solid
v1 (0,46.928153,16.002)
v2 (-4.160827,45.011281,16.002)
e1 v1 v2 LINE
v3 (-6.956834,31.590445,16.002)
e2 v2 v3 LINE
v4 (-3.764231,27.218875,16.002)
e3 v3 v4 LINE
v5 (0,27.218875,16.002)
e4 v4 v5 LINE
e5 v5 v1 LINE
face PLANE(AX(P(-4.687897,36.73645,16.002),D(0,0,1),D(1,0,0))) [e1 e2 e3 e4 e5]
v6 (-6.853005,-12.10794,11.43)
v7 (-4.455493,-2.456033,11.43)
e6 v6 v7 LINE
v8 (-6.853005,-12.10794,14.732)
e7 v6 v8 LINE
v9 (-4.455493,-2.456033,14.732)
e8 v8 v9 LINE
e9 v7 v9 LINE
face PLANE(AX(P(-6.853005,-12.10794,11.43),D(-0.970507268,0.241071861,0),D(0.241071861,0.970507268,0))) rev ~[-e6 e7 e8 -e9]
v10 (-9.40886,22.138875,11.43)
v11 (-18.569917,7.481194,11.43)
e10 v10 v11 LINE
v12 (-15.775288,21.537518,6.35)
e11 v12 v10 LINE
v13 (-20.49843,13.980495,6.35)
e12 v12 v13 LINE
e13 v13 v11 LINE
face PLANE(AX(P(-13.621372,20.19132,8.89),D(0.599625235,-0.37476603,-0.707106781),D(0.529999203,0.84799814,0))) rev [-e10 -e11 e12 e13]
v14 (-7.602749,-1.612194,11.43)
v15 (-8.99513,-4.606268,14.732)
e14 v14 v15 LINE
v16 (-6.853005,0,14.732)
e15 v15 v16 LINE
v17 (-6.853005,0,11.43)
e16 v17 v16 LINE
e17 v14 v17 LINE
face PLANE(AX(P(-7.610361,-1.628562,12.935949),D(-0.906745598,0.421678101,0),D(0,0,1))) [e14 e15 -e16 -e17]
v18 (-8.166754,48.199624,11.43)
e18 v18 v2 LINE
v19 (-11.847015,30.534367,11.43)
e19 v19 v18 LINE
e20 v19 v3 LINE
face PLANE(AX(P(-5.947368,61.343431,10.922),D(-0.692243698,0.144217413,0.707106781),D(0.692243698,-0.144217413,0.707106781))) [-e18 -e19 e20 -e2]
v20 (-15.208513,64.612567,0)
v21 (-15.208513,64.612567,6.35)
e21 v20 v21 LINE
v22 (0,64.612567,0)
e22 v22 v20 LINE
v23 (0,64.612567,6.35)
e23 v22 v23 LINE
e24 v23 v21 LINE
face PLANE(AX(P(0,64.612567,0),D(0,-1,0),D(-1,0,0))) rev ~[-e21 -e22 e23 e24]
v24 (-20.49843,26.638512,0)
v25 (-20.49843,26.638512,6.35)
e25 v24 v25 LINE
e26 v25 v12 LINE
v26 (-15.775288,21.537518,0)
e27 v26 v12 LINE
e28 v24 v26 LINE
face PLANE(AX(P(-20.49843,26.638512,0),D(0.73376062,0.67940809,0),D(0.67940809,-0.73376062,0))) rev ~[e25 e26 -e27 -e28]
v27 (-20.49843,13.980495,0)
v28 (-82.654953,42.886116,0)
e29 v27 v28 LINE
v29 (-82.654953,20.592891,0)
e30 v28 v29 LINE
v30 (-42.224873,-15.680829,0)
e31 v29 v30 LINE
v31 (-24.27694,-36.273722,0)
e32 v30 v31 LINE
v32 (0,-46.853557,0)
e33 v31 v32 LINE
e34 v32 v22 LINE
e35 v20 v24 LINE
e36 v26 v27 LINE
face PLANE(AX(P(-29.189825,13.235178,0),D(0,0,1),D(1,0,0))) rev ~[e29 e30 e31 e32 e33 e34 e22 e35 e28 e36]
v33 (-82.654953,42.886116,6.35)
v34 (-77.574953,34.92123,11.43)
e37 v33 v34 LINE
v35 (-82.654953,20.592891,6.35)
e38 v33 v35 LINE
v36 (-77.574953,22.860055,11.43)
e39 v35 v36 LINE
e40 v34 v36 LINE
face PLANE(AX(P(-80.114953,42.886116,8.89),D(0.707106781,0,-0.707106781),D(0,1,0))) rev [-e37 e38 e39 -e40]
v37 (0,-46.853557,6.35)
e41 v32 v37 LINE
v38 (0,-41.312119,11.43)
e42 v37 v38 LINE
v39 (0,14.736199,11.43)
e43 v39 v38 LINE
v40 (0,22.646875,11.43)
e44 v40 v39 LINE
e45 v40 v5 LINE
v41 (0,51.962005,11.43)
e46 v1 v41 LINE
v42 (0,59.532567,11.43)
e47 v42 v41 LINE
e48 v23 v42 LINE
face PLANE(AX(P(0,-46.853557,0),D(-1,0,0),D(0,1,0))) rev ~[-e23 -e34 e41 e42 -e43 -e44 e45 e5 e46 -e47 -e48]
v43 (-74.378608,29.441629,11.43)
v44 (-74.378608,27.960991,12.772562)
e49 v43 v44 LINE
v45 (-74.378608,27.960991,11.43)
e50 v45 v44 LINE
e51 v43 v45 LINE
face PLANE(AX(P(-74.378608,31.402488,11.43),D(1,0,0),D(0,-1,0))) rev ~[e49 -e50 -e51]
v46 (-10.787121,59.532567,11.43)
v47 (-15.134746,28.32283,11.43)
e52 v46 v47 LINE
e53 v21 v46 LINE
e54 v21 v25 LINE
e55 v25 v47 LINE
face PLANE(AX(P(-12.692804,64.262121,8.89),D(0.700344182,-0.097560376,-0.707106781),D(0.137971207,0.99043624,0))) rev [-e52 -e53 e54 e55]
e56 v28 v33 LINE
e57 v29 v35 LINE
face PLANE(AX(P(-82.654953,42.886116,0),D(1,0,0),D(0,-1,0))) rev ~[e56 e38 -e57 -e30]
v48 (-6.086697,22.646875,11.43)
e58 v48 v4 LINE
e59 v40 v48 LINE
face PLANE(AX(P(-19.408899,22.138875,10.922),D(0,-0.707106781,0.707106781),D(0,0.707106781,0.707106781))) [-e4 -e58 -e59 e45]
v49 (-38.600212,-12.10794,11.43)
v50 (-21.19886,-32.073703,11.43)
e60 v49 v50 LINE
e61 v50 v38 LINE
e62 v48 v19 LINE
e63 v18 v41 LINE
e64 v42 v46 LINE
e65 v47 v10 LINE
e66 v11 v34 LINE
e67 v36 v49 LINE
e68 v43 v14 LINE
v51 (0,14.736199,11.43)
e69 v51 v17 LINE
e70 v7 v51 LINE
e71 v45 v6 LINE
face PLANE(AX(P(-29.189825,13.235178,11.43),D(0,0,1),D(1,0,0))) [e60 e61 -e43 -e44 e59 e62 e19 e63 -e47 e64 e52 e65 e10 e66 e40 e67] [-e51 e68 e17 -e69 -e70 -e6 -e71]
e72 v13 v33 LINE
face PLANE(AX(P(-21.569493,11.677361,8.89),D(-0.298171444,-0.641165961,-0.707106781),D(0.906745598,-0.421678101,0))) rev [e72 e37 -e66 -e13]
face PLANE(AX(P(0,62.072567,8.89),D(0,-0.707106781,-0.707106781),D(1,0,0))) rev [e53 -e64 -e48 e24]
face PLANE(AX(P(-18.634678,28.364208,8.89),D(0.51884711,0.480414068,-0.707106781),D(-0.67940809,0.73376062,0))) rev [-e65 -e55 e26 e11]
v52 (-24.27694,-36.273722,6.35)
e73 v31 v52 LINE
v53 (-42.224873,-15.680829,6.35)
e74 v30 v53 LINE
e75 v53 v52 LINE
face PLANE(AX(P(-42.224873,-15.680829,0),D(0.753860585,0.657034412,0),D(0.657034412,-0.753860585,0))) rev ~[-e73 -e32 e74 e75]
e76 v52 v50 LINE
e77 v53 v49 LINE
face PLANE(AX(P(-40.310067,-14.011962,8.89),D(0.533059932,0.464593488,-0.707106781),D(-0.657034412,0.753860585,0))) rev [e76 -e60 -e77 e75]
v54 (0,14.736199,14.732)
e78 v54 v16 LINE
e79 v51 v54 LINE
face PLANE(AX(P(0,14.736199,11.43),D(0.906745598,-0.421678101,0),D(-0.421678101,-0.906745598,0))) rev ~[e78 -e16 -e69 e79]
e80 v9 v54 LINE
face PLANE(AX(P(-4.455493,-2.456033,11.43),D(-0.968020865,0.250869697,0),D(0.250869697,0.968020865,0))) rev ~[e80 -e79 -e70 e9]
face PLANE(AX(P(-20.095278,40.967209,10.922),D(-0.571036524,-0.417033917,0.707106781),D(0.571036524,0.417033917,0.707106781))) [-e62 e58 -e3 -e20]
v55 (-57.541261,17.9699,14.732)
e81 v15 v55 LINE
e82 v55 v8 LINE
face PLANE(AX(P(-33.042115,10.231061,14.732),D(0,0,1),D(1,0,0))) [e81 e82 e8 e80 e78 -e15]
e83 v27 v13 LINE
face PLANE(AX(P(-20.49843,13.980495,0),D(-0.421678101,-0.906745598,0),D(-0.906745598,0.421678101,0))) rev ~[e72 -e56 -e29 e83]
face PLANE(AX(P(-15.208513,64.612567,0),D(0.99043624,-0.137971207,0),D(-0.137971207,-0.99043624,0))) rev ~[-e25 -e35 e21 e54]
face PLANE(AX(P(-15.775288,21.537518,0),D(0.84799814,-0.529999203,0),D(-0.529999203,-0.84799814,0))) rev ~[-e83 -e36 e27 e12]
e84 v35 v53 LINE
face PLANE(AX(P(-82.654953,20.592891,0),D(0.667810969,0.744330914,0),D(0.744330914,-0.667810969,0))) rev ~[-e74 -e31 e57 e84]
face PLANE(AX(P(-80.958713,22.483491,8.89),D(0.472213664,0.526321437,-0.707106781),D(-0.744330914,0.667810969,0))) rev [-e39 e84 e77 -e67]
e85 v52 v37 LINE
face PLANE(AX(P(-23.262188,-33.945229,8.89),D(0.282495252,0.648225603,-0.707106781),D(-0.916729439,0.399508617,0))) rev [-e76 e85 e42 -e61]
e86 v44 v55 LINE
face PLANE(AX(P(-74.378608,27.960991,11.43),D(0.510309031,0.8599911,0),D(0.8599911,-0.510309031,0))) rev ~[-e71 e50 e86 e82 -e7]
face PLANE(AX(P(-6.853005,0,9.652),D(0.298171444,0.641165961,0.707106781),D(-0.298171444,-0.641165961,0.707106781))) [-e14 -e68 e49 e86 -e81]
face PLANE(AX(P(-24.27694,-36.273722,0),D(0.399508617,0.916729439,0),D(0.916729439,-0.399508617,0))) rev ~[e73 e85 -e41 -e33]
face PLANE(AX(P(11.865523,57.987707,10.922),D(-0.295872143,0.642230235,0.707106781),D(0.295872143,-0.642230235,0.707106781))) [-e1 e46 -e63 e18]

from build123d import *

# Parameters (mm, degrees)
F1_DEPTH     = 11.43
F2_SIZE      = 5.08
F4_DEPTH     = 4.572
F5_T4_DEPTH  = 35.6101050897
F5_T9_DEPTH  = 44.6545724626
F5_T14_DEPTH = 36.379020654
F5_T19_DEPTH = 32.4730482843
F7_DEPTH     = 3.302
F8_T4_DEPTH  = 87.5344337201


# Not quite as in the source:
# - a fillet or chamfer that OpenCascade refuses, or shapes differently, is made with other operations: its cross-section is extruded or revolved along the edge and cut away or added


with BuildPart() as f1:
    # F0 (on Top) → F1 (new body)
    with BuildSketch(Plane.XY):
        Polygon((0, -46.853557229), (0, 64.6125674248), (-15.2085125446, 64.6125674248), (-20.4984303564, 26.6385115683), (-15.7752875239, 21.5375181288), (-20.4984303564, 13.9804948121), (-82.6549530029, 42.8861156106), (-82.6549530029, 20.5928906798), (-42.2248728573, -15.6808290631), (-24.276940152, -36.2737216055), align=None)
    extrude(amount=F1_DEPTH)

    # F2
    f2_edges = [f1.edges().sort_by_distance(p)[0] for p in [
        (-51.576692, 28.433305, 11.43),
        (-82.654953, 31.739503, 11.43),
        (-62.439913, 2.456031, 11.43),
        (-18.136859, 17.759006, 11.43),
        (-18.136859, 24.088015, 11.43),
        (-17.853471, 45.625539, 11.43),
        (-7.604256, 64.612567, 11.43),
        (-33.250907, -25.977275, 11.43),
        (-12.13847, -41.563639, 11.43),
    ]]
    chamfer(f2_edges, length=F2_SIZE)

    # F3 (on face) → F4 (join)
    with BuildSketch(Plane.XY.offset(11.43)):
        Polygon((0, 22.1388745617), (0, 52.5213219225), (-8.6118569598, 48.5538840294), (-12.3903686181, 30.4170250893), (-6.3447491266, 22.1388745617), align=None)
    extrude(amount=F4_DEPTH)

    # F5: chamfer of 5.08 on 4 edges, made by hand


with BuildPart() as f5_tool2:
    # F5_s3 → F5_t4 (new body)
    with BuildSketch(Plane(origin=(31.8255199814, 14.6618522037, 0), x_dir=(0, 0, 1), z_dir=(-0.9082507089, -0.418426397, 0))):
        Polygon((10.922, 47.7025278707), (16.002, 42.6225278707), (16.002, 47.7025278707), align=None)
    extrude(amount=F5_T4_DEPTH)

    split(bisect_by=Plane.XY.offset(11.43), keep=Keep.TOP)


with BuildPart() as f1_1:
    add(f1.part)

    # F5_t1: cut F5_tool2
    add(f5_tool2.part, mode=Mode.SUBTRACT)


with BuildPart() as f5_tool7:
    # F5_s8 → F5_t9 (new body)
    with BuildSketch(Plane(origin=(12.0008759003, 57.6042137868, 0), x_dir=(0, 0, 1), z_dir=(-0.203954222, -0.9789804264, 0))):
        Polygon((10.922, 18.3336090407), (16.002, 13.2536090407), (16.002, 18.3336090407), align=None)
    extrude(amount=F5_T9_DEPTH)

    split(bisect_by=Plane.XY.offset(11.43), keep=Keep.TOP)


with BuildPart() as f1_2:
    add(f1_1.part)

    # F5_t6: cut F5_tool7
    add(f5_tool7.part, mode=Mode.SUBTRACT)


with BuildPart() as f5_tool12:
    # F5_s13 → F5_t14 (new body)
    with BuildSketch(Plane(origin=(-26.5018256682, 36.2884403239, 0), x_dir=(0, 0, 1), z_dir=(0.5897750216, -0.8075675971, 0))):
        Polygon((10.922, -7.9331414154), (16.002, -13.0131414154), (16.002, -7.9331414154), align=None)
    extrude(amount=F5_T14_DEPTH)

    split(bisect_by=Plane.XY.offset(11.43), keep=Keep.TOP)


with BuildPart() as f1_3:
    add(f1_2.part)

    # F5_t11: cut F5_tool12
    add(f5_tool12.part, mode=Mode.SUBTRACT)


with BuildPart() as f5_tool17:
    # F5_s18 → F5_t19 (new body)
    with BuildSketch(Plane.YZ.offset(-19.4088987055)):
        Polygon((22.1388745617, 10.922), (27.2188745617, 16.002), (22.1388745617, 16.002), align=None)
    extrude(amount=F5_T19_DEPTH)

    split(bisect_by=Plane.XY.offset(11.43), keep=Keep.TOP)


with BuildPart() as f1_4:
    add(f1_3.part)

    # F5_t16: cut F5_tool17
    add(f5_tool17.part, mode=Mode.SUBTRACT)

    # F6 (on face) → F7 (join)
    with BuildSketch(Plane.XY.offset(11.43)):
        Polygon((-4.4554928318, -2.4560331367), (0, 14.7361988202), (-6.8530052353, 0), (-74.3786075584, 31.4024879744), (-74.3786075584, 27.9609914869), (-6.8530052353, -12.1079402775), align=None)
    extrude(amount=F7_DEPTH)

    # F8: chamfer of 5.08 on 1 edges, made by hand


with BuildPart() as f8_tool2:
    # F8_s3 → F8_t4 (new body)
    with BuildSketch(Plane(origin=(-5.6344557861, 2.6202791827, 0), x_dir=(0, 0, 1), z_dir=(-0.9067455979, 0.4216781007, 0))):
        Polygon((9.652, -2.8897622316), (14.732, -7.9697622316), (14.732, -2.8897622316), align=None)
    extrude(amount=F8_T4_DEPTH)

    split(bisect_by=Plane.XY.offset(11.43), keep=Keep.TOP)


with BuildPart() as f1_5:
    add(f1_4.part)

    # F8_t1: cut F8_tool2
    add(f8_tool2.part, mode=Mode.SUBTRACT)


solid = f1_5.part
